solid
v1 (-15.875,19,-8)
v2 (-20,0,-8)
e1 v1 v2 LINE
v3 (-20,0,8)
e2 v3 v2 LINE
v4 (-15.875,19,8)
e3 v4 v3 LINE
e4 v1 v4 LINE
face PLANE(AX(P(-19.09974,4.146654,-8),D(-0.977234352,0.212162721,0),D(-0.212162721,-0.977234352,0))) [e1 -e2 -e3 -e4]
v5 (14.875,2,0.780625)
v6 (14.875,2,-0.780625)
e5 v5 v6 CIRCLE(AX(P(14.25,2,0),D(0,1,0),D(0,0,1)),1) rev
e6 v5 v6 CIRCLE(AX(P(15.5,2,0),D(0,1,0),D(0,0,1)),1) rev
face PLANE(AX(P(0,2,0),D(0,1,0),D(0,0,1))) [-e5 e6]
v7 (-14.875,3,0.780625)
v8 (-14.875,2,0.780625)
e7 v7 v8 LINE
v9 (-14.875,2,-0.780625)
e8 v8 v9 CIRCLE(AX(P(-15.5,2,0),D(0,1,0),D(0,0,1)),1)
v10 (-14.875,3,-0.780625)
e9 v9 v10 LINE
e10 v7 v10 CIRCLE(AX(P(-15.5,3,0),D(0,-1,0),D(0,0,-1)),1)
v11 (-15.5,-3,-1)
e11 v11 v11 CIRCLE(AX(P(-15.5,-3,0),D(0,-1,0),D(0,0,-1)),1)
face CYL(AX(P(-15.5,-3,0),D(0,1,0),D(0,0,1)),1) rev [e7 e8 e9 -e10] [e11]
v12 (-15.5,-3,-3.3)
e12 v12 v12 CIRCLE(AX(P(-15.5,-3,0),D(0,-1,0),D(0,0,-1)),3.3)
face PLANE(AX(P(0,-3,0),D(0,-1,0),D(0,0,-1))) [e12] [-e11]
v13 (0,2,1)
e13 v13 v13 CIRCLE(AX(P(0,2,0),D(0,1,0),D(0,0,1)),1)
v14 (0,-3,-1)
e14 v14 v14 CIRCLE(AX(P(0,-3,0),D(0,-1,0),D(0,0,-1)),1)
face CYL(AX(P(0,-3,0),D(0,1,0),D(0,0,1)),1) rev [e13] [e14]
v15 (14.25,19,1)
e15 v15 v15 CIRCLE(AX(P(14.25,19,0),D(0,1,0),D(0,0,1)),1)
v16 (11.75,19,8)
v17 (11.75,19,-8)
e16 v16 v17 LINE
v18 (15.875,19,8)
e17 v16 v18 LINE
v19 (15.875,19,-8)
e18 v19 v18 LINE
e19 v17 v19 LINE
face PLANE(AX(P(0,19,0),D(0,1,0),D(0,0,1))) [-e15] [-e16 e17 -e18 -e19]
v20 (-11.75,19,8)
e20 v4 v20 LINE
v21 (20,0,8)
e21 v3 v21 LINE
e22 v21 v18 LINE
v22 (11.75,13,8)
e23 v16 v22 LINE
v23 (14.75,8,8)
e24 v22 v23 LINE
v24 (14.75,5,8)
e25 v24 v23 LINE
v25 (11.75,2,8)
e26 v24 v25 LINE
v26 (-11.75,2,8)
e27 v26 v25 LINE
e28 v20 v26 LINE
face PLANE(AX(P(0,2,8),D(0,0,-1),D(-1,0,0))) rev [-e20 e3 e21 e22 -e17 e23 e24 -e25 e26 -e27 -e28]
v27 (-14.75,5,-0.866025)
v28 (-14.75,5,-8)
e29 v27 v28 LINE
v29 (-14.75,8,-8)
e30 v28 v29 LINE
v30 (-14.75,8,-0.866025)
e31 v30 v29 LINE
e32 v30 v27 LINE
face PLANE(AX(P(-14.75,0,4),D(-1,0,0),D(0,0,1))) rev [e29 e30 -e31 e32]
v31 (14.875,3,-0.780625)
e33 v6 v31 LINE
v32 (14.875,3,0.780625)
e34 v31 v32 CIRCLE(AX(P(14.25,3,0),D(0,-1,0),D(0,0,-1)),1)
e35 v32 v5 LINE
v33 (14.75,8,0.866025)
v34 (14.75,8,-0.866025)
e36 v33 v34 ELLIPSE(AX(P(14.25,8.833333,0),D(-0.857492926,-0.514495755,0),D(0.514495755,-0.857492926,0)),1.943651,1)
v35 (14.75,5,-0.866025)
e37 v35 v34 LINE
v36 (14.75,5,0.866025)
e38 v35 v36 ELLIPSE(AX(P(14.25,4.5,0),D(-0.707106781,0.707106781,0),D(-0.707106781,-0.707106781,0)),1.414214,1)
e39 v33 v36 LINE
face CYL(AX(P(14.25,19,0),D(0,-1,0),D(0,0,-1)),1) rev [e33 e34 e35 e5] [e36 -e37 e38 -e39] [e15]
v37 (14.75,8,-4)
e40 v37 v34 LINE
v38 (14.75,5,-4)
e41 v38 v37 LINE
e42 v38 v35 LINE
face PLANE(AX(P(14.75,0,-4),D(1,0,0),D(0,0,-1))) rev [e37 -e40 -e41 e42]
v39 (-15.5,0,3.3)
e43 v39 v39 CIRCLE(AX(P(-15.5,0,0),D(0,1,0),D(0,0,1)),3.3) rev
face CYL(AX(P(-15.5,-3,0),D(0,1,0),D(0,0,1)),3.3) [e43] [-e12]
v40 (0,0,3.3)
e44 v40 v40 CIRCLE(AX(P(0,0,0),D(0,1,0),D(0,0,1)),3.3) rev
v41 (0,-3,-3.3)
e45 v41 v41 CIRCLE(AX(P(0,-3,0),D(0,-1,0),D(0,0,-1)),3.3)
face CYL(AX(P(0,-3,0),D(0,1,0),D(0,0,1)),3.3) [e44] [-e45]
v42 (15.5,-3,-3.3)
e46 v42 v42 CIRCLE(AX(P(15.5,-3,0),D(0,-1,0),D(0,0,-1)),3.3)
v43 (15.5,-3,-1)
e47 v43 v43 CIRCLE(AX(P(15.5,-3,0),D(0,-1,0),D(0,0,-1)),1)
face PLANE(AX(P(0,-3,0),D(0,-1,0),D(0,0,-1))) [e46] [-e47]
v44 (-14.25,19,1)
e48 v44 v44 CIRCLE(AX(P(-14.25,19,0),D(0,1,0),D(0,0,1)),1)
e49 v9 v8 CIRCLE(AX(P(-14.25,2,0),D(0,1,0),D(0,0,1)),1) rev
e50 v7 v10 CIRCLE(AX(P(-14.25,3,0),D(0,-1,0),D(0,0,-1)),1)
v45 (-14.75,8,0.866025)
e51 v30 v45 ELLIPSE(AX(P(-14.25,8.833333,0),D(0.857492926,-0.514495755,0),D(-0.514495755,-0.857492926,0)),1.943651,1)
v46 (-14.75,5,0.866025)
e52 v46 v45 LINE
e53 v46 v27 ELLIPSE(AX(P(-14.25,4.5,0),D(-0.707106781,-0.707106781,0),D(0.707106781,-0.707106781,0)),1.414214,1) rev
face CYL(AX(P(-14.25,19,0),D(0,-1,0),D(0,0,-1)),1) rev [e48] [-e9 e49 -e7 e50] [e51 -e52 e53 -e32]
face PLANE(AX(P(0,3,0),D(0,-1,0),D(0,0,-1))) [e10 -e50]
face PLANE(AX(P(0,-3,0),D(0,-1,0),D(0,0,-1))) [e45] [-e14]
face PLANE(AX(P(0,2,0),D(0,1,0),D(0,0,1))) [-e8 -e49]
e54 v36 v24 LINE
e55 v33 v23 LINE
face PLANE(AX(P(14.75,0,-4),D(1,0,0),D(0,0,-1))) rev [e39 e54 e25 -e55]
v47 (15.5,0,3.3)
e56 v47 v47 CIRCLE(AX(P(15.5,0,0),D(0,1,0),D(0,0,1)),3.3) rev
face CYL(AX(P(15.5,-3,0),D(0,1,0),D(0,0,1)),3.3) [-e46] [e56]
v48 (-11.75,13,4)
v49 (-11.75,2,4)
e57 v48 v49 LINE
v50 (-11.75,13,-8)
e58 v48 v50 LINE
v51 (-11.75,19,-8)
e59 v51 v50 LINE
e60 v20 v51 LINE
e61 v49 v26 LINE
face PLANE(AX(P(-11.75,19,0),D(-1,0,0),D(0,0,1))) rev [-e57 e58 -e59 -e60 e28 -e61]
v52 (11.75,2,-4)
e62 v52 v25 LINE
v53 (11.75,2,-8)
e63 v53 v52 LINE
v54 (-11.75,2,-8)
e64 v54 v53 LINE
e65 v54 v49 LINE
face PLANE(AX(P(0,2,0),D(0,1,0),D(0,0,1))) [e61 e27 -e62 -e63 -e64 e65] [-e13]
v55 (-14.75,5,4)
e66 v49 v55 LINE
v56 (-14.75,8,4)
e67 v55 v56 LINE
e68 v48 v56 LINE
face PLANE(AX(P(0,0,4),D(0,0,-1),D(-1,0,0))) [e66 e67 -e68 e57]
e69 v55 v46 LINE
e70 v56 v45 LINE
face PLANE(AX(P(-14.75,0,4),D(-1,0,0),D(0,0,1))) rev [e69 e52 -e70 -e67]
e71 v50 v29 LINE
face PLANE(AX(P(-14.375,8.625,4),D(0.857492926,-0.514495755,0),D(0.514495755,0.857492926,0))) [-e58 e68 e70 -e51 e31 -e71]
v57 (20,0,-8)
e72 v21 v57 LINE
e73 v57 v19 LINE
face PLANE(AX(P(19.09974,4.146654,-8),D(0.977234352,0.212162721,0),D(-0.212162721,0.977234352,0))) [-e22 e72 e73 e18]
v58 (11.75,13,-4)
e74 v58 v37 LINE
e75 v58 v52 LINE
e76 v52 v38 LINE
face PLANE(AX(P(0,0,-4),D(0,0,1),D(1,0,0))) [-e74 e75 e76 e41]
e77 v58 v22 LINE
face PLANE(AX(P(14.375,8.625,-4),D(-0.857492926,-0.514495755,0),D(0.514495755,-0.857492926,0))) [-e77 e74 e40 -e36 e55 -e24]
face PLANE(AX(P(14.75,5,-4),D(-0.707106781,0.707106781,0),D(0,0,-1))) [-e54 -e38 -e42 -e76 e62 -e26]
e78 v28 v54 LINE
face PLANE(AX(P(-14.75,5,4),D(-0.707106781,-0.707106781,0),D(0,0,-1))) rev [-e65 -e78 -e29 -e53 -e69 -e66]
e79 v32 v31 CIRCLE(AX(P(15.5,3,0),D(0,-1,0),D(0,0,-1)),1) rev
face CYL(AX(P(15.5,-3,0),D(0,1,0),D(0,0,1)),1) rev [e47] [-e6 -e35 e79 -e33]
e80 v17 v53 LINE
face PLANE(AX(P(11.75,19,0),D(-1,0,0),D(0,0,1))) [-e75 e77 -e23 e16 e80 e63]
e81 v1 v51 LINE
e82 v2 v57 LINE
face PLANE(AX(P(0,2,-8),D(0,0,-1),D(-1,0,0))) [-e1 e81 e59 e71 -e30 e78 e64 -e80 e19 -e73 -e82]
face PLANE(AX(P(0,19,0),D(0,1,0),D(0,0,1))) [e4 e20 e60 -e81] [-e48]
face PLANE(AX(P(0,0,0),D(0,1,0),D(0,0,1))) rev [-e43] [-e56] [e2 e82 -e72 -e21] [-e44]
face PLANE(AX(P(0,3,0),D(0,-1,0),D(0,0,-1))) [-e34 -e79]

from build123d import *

# Parameters (mm, degrees)
ESBO_O1_W                = 40
ESBO_O1_H                = 16
RESSALTO_EXTRUS_O1_DEPTH = 2
ESBO_O1_4_W              = 8.25
ESBO_O1_4_H              = 16
ESBO_O1_4_R              = 1
RESSALTO_EXTRUS_O2_DEPTH = 19
ESBO_O2_R                = 3.3
ESBO_O2_R_2              = 1
RESSALTO_EXTRUS_O3_DEPTH = 3
CORTE_EXTRUS_O1_DEPTH    = 32.890437438
CORTE_EXTRUS_O3_DEPTH    = 12
CORTE_EXTRUS_O4_DEPTH    = 12
CHANFRO1_SIZE            = 3
CORTE_EXTRUS_O5_START    = -6
ESBO_O7_R                = 1
CORTE_EXTRUS_O5_DEPTH    = 6


with BuildPart() as part:
    # Esboço1 → Ressalto-extrusão1 (new body)
    with BuildSketch(Plane(origin=(0, 0, 0), x_dir=(1, 0, 0), z_dir=(0, 1, 0))):
        Rectangle(ESBO_O1_W, ESBO_O1_H)
    extrude(amount=RESSALTO_EXTRUS_O1_DEPTH)

    # Esboço1<4> → Ressalto-extrusão2 (add)
    # profile 1 of 2: a face of its own
    with BuildSketch(Plane(origin=(0, 0, 0), x_dir=(1, 0, 0), z_dir=(0, 1, 0))):
        with Locations((-15.875, 0)):
            Rectangle(ESBO_O1_4_W, ESBO_O1_4_H)
        with Locations(Location((-14.25, 0, 0), (0, 0, 270))):
            Circle(ESBO_O1_4_R, mode=Mode.SUBTRACT)
    # profile 2 of 2: a face of its own
    with BuildSketch(Plane(origin=(0, 0, 0), x_dir=(1, 0, 0), z_dir=(0, 1, 0))):
        with Locations((15.875, 0)):
            Rectangle(ESBO_O1_4_W, ESBO_O1_4_H)
        with Locations(Location((14.25, 0, 0), (0, 0, 270))):
            Circle(ESBO_O1_4_R, mode=Mode.SUBTRACT)
    extrude(amount=RESSALTO_EXTRUS_O2_DEPTH)

    # Esboço2 → Ressalto-extrusão3 (add)
    # profile 1 of 3: a face of its own
    with BuildSketch(Plane.XZ):
        with Locations(Location((0, 0, 0), (0, 0, 90))):
            Circle(ESBO_O2_R)
        with Locations(Location((0, 0, 0), (0, 0, 270))):
            Circle(ESBO_O2_R_2, mode=Mode.SUBTRACT)
    # profile 2 of 3: a face of its own
    with BuildSketch(Plane.XZ):
        with Locations(Location((-15.5, 0, 0), (0, 0, 90))):
            Circle(ESBO_O2_R)
        with Locations(Location((-15.5, 0, 0), (0, 0, 270))):
            Circle(ESBO_O2_R_2, mode=Mode.SUBTRACT)
    # profile 3 of 3: a face of its own
    with BuildSketch(Plane.XZ):
        with Locations(Location((15.5, 0, 0), (0, 0, 90))):
            Circle(ESBO_O2_R)
        with Locations(Location((15.5, 0, 0), (0, 0, 270))):
            Circle(ESBO_O2_R_2, mode=Mode.SUBTRACT)
    extrude(amount=RESSALTO_EXTRUS_O3_DEPTH)

    # Esboço3 → Corte-extrusão1 (cut, through all)
    with BuildSketch(Plane.XY.offset(8)):
        Polygon((15.875, 19), (20, 0), (20, 19), align=None)
        Polygon((-20, 0), (-15.875, 19), (-20, 19), align=None)
    extrude(amount=-CORTE_EXTRUS_O1_DEPTH, mode=Mode.SUBTRACT)

    # Esboço4 → Corte-extrusão3 (cut)
    with BuildSketch(Plane(origin=(0, 0, -8), x_dir=(-1, 0, 0), z_dir=(0, 0, -1))):
        Polygon((14.75, 8), (11.75, 13), (11.75, 5), (14.75, 5), align=None)
    extrude(amount=-CORTE_EXTRUS_O3_DEPTH, mode=Mode.SUBTRACT)

    # Esboço6 → Corte-extrusão4 (cut)
    with BuildSketch(Plane.XY.offset(8)):
        Polygon((14.75, 8), (11.75, 13), (11.75, 5), (14.75, 5), align=None)
    extrude(amount=-CORTE_EXTRUS_O4_DEPTH, mode=Mode.SUBTRACT)

    # Chanfro1
    # the kernel refuses this chamfer: 3 mm, written as the material it takes off along each edge
    with BuildSketch(Plane(origin=(11.75, 5, 15.715048964), x_dir=(-0.027495876610586202, -0.9996219169112968, 0), z_dir=(0, 0, -1))) as chanfro1_piece_1_section:
        Polygon((CHANFRO1_SIZE * 0.999621916911, -CHANFRO1_SIZE * 0.0274958766106), (-CHANFRO1_SIZE * 0.0274958766106, -CHANFRO1_SIZE * 0.999621916911), (0, 0), align=None)
    chanfro1_piece_1 = extrude(amount=19.715048964, mode=Mode.PRIVATE)
    chanfro1_piece_1 = split(chanfro1_piece_1, bisect_by=Plane(origin=(12.737731783, 2, 5.857524482), z_dir=(0, 1, 0)), keep=Keep.TOP, mode=Mode.PRIVATE)
    chanfro1_piece_1 = split(chanfro1_piece_1, bisect_by=Plane(origin=(14.75, 4.012268217, 5.857524482), z_dir=(-1, 0, 0)), keep=Keep.TOP, mode=Mode.PRIVATE)
    add(chanfro1_piece_1, mode=Mode.SUBTRACT)
    with BuildSketch(Plane(origin=(-11.75, 5, -15.715048964), x_dir=(0.027495876610586202, -0.9996219169112968, 0), z_dir=(0, 0, 1))) as chanfro1_piece_2_section:
        Polygon((CHANFRO1_SIZE * 0.999621916911, -CHANFRO1_SIZE * 0.0274958766106), (-CHANFRO1_SIZE * 0.0274958766106, -CHANFRO1_SIZE * 0.999621916911), (0, 0), align=None)
    chanfro1_piece_2 = extrude(amount=19.715048964, mode=Mode.PRIVATE)
    chanfro1_piece_2 = split(chanfro1_piece_2, bisect_by=Plane(origin=(-12.737731783, 2, -5.857524482), z_dir=(0, 1, 0)), keep=Keep.TOP, mode=Mode.PRIVATE)
    chanfro1_piece_2 = split(chanfro1_piece_2, bisect_by=Plane(origin=(-14.75, 4.012268217, -5.857524482), z_dir=(1, 0, 0)), keep=Keep.TOP, mode=Mode.PRIVATE)
    add(chanfro1_piece_2, mode=Mode.SUBTRACT)

    # Esboço7 → Corte-extrusão5 (cut)
    with BuildSketch(Plane.XZ.offset(3).offset(CORTE_EXTRUS_O5_START)):
        with Locations(Location((0, 0, 0), (0, 0, 90))):
            Circle(ESBO_O7_R)
        with Locations(Location((-15.5, 0, 0), (0, 0, 51.317812547))):
            Circle(ESBO_O7_R)
        with BuildLine():
            ThreePointArc((14.5, 0), (15.5, -1), (16.5, 0))
            Line((16.5, 0), (14.5, 0))
        make_face()
        with BuildLine():
            Line((14.5, 0), (16.5, 0))
            ThreePointArc((16.5, 0), (15.5, 1), (14.5, 0))
        make_face()
    extrude(amount=CORTE_EXTRUS_O5_DEPTH, mode=Mode.SUBTRACT)


solid = part.part
